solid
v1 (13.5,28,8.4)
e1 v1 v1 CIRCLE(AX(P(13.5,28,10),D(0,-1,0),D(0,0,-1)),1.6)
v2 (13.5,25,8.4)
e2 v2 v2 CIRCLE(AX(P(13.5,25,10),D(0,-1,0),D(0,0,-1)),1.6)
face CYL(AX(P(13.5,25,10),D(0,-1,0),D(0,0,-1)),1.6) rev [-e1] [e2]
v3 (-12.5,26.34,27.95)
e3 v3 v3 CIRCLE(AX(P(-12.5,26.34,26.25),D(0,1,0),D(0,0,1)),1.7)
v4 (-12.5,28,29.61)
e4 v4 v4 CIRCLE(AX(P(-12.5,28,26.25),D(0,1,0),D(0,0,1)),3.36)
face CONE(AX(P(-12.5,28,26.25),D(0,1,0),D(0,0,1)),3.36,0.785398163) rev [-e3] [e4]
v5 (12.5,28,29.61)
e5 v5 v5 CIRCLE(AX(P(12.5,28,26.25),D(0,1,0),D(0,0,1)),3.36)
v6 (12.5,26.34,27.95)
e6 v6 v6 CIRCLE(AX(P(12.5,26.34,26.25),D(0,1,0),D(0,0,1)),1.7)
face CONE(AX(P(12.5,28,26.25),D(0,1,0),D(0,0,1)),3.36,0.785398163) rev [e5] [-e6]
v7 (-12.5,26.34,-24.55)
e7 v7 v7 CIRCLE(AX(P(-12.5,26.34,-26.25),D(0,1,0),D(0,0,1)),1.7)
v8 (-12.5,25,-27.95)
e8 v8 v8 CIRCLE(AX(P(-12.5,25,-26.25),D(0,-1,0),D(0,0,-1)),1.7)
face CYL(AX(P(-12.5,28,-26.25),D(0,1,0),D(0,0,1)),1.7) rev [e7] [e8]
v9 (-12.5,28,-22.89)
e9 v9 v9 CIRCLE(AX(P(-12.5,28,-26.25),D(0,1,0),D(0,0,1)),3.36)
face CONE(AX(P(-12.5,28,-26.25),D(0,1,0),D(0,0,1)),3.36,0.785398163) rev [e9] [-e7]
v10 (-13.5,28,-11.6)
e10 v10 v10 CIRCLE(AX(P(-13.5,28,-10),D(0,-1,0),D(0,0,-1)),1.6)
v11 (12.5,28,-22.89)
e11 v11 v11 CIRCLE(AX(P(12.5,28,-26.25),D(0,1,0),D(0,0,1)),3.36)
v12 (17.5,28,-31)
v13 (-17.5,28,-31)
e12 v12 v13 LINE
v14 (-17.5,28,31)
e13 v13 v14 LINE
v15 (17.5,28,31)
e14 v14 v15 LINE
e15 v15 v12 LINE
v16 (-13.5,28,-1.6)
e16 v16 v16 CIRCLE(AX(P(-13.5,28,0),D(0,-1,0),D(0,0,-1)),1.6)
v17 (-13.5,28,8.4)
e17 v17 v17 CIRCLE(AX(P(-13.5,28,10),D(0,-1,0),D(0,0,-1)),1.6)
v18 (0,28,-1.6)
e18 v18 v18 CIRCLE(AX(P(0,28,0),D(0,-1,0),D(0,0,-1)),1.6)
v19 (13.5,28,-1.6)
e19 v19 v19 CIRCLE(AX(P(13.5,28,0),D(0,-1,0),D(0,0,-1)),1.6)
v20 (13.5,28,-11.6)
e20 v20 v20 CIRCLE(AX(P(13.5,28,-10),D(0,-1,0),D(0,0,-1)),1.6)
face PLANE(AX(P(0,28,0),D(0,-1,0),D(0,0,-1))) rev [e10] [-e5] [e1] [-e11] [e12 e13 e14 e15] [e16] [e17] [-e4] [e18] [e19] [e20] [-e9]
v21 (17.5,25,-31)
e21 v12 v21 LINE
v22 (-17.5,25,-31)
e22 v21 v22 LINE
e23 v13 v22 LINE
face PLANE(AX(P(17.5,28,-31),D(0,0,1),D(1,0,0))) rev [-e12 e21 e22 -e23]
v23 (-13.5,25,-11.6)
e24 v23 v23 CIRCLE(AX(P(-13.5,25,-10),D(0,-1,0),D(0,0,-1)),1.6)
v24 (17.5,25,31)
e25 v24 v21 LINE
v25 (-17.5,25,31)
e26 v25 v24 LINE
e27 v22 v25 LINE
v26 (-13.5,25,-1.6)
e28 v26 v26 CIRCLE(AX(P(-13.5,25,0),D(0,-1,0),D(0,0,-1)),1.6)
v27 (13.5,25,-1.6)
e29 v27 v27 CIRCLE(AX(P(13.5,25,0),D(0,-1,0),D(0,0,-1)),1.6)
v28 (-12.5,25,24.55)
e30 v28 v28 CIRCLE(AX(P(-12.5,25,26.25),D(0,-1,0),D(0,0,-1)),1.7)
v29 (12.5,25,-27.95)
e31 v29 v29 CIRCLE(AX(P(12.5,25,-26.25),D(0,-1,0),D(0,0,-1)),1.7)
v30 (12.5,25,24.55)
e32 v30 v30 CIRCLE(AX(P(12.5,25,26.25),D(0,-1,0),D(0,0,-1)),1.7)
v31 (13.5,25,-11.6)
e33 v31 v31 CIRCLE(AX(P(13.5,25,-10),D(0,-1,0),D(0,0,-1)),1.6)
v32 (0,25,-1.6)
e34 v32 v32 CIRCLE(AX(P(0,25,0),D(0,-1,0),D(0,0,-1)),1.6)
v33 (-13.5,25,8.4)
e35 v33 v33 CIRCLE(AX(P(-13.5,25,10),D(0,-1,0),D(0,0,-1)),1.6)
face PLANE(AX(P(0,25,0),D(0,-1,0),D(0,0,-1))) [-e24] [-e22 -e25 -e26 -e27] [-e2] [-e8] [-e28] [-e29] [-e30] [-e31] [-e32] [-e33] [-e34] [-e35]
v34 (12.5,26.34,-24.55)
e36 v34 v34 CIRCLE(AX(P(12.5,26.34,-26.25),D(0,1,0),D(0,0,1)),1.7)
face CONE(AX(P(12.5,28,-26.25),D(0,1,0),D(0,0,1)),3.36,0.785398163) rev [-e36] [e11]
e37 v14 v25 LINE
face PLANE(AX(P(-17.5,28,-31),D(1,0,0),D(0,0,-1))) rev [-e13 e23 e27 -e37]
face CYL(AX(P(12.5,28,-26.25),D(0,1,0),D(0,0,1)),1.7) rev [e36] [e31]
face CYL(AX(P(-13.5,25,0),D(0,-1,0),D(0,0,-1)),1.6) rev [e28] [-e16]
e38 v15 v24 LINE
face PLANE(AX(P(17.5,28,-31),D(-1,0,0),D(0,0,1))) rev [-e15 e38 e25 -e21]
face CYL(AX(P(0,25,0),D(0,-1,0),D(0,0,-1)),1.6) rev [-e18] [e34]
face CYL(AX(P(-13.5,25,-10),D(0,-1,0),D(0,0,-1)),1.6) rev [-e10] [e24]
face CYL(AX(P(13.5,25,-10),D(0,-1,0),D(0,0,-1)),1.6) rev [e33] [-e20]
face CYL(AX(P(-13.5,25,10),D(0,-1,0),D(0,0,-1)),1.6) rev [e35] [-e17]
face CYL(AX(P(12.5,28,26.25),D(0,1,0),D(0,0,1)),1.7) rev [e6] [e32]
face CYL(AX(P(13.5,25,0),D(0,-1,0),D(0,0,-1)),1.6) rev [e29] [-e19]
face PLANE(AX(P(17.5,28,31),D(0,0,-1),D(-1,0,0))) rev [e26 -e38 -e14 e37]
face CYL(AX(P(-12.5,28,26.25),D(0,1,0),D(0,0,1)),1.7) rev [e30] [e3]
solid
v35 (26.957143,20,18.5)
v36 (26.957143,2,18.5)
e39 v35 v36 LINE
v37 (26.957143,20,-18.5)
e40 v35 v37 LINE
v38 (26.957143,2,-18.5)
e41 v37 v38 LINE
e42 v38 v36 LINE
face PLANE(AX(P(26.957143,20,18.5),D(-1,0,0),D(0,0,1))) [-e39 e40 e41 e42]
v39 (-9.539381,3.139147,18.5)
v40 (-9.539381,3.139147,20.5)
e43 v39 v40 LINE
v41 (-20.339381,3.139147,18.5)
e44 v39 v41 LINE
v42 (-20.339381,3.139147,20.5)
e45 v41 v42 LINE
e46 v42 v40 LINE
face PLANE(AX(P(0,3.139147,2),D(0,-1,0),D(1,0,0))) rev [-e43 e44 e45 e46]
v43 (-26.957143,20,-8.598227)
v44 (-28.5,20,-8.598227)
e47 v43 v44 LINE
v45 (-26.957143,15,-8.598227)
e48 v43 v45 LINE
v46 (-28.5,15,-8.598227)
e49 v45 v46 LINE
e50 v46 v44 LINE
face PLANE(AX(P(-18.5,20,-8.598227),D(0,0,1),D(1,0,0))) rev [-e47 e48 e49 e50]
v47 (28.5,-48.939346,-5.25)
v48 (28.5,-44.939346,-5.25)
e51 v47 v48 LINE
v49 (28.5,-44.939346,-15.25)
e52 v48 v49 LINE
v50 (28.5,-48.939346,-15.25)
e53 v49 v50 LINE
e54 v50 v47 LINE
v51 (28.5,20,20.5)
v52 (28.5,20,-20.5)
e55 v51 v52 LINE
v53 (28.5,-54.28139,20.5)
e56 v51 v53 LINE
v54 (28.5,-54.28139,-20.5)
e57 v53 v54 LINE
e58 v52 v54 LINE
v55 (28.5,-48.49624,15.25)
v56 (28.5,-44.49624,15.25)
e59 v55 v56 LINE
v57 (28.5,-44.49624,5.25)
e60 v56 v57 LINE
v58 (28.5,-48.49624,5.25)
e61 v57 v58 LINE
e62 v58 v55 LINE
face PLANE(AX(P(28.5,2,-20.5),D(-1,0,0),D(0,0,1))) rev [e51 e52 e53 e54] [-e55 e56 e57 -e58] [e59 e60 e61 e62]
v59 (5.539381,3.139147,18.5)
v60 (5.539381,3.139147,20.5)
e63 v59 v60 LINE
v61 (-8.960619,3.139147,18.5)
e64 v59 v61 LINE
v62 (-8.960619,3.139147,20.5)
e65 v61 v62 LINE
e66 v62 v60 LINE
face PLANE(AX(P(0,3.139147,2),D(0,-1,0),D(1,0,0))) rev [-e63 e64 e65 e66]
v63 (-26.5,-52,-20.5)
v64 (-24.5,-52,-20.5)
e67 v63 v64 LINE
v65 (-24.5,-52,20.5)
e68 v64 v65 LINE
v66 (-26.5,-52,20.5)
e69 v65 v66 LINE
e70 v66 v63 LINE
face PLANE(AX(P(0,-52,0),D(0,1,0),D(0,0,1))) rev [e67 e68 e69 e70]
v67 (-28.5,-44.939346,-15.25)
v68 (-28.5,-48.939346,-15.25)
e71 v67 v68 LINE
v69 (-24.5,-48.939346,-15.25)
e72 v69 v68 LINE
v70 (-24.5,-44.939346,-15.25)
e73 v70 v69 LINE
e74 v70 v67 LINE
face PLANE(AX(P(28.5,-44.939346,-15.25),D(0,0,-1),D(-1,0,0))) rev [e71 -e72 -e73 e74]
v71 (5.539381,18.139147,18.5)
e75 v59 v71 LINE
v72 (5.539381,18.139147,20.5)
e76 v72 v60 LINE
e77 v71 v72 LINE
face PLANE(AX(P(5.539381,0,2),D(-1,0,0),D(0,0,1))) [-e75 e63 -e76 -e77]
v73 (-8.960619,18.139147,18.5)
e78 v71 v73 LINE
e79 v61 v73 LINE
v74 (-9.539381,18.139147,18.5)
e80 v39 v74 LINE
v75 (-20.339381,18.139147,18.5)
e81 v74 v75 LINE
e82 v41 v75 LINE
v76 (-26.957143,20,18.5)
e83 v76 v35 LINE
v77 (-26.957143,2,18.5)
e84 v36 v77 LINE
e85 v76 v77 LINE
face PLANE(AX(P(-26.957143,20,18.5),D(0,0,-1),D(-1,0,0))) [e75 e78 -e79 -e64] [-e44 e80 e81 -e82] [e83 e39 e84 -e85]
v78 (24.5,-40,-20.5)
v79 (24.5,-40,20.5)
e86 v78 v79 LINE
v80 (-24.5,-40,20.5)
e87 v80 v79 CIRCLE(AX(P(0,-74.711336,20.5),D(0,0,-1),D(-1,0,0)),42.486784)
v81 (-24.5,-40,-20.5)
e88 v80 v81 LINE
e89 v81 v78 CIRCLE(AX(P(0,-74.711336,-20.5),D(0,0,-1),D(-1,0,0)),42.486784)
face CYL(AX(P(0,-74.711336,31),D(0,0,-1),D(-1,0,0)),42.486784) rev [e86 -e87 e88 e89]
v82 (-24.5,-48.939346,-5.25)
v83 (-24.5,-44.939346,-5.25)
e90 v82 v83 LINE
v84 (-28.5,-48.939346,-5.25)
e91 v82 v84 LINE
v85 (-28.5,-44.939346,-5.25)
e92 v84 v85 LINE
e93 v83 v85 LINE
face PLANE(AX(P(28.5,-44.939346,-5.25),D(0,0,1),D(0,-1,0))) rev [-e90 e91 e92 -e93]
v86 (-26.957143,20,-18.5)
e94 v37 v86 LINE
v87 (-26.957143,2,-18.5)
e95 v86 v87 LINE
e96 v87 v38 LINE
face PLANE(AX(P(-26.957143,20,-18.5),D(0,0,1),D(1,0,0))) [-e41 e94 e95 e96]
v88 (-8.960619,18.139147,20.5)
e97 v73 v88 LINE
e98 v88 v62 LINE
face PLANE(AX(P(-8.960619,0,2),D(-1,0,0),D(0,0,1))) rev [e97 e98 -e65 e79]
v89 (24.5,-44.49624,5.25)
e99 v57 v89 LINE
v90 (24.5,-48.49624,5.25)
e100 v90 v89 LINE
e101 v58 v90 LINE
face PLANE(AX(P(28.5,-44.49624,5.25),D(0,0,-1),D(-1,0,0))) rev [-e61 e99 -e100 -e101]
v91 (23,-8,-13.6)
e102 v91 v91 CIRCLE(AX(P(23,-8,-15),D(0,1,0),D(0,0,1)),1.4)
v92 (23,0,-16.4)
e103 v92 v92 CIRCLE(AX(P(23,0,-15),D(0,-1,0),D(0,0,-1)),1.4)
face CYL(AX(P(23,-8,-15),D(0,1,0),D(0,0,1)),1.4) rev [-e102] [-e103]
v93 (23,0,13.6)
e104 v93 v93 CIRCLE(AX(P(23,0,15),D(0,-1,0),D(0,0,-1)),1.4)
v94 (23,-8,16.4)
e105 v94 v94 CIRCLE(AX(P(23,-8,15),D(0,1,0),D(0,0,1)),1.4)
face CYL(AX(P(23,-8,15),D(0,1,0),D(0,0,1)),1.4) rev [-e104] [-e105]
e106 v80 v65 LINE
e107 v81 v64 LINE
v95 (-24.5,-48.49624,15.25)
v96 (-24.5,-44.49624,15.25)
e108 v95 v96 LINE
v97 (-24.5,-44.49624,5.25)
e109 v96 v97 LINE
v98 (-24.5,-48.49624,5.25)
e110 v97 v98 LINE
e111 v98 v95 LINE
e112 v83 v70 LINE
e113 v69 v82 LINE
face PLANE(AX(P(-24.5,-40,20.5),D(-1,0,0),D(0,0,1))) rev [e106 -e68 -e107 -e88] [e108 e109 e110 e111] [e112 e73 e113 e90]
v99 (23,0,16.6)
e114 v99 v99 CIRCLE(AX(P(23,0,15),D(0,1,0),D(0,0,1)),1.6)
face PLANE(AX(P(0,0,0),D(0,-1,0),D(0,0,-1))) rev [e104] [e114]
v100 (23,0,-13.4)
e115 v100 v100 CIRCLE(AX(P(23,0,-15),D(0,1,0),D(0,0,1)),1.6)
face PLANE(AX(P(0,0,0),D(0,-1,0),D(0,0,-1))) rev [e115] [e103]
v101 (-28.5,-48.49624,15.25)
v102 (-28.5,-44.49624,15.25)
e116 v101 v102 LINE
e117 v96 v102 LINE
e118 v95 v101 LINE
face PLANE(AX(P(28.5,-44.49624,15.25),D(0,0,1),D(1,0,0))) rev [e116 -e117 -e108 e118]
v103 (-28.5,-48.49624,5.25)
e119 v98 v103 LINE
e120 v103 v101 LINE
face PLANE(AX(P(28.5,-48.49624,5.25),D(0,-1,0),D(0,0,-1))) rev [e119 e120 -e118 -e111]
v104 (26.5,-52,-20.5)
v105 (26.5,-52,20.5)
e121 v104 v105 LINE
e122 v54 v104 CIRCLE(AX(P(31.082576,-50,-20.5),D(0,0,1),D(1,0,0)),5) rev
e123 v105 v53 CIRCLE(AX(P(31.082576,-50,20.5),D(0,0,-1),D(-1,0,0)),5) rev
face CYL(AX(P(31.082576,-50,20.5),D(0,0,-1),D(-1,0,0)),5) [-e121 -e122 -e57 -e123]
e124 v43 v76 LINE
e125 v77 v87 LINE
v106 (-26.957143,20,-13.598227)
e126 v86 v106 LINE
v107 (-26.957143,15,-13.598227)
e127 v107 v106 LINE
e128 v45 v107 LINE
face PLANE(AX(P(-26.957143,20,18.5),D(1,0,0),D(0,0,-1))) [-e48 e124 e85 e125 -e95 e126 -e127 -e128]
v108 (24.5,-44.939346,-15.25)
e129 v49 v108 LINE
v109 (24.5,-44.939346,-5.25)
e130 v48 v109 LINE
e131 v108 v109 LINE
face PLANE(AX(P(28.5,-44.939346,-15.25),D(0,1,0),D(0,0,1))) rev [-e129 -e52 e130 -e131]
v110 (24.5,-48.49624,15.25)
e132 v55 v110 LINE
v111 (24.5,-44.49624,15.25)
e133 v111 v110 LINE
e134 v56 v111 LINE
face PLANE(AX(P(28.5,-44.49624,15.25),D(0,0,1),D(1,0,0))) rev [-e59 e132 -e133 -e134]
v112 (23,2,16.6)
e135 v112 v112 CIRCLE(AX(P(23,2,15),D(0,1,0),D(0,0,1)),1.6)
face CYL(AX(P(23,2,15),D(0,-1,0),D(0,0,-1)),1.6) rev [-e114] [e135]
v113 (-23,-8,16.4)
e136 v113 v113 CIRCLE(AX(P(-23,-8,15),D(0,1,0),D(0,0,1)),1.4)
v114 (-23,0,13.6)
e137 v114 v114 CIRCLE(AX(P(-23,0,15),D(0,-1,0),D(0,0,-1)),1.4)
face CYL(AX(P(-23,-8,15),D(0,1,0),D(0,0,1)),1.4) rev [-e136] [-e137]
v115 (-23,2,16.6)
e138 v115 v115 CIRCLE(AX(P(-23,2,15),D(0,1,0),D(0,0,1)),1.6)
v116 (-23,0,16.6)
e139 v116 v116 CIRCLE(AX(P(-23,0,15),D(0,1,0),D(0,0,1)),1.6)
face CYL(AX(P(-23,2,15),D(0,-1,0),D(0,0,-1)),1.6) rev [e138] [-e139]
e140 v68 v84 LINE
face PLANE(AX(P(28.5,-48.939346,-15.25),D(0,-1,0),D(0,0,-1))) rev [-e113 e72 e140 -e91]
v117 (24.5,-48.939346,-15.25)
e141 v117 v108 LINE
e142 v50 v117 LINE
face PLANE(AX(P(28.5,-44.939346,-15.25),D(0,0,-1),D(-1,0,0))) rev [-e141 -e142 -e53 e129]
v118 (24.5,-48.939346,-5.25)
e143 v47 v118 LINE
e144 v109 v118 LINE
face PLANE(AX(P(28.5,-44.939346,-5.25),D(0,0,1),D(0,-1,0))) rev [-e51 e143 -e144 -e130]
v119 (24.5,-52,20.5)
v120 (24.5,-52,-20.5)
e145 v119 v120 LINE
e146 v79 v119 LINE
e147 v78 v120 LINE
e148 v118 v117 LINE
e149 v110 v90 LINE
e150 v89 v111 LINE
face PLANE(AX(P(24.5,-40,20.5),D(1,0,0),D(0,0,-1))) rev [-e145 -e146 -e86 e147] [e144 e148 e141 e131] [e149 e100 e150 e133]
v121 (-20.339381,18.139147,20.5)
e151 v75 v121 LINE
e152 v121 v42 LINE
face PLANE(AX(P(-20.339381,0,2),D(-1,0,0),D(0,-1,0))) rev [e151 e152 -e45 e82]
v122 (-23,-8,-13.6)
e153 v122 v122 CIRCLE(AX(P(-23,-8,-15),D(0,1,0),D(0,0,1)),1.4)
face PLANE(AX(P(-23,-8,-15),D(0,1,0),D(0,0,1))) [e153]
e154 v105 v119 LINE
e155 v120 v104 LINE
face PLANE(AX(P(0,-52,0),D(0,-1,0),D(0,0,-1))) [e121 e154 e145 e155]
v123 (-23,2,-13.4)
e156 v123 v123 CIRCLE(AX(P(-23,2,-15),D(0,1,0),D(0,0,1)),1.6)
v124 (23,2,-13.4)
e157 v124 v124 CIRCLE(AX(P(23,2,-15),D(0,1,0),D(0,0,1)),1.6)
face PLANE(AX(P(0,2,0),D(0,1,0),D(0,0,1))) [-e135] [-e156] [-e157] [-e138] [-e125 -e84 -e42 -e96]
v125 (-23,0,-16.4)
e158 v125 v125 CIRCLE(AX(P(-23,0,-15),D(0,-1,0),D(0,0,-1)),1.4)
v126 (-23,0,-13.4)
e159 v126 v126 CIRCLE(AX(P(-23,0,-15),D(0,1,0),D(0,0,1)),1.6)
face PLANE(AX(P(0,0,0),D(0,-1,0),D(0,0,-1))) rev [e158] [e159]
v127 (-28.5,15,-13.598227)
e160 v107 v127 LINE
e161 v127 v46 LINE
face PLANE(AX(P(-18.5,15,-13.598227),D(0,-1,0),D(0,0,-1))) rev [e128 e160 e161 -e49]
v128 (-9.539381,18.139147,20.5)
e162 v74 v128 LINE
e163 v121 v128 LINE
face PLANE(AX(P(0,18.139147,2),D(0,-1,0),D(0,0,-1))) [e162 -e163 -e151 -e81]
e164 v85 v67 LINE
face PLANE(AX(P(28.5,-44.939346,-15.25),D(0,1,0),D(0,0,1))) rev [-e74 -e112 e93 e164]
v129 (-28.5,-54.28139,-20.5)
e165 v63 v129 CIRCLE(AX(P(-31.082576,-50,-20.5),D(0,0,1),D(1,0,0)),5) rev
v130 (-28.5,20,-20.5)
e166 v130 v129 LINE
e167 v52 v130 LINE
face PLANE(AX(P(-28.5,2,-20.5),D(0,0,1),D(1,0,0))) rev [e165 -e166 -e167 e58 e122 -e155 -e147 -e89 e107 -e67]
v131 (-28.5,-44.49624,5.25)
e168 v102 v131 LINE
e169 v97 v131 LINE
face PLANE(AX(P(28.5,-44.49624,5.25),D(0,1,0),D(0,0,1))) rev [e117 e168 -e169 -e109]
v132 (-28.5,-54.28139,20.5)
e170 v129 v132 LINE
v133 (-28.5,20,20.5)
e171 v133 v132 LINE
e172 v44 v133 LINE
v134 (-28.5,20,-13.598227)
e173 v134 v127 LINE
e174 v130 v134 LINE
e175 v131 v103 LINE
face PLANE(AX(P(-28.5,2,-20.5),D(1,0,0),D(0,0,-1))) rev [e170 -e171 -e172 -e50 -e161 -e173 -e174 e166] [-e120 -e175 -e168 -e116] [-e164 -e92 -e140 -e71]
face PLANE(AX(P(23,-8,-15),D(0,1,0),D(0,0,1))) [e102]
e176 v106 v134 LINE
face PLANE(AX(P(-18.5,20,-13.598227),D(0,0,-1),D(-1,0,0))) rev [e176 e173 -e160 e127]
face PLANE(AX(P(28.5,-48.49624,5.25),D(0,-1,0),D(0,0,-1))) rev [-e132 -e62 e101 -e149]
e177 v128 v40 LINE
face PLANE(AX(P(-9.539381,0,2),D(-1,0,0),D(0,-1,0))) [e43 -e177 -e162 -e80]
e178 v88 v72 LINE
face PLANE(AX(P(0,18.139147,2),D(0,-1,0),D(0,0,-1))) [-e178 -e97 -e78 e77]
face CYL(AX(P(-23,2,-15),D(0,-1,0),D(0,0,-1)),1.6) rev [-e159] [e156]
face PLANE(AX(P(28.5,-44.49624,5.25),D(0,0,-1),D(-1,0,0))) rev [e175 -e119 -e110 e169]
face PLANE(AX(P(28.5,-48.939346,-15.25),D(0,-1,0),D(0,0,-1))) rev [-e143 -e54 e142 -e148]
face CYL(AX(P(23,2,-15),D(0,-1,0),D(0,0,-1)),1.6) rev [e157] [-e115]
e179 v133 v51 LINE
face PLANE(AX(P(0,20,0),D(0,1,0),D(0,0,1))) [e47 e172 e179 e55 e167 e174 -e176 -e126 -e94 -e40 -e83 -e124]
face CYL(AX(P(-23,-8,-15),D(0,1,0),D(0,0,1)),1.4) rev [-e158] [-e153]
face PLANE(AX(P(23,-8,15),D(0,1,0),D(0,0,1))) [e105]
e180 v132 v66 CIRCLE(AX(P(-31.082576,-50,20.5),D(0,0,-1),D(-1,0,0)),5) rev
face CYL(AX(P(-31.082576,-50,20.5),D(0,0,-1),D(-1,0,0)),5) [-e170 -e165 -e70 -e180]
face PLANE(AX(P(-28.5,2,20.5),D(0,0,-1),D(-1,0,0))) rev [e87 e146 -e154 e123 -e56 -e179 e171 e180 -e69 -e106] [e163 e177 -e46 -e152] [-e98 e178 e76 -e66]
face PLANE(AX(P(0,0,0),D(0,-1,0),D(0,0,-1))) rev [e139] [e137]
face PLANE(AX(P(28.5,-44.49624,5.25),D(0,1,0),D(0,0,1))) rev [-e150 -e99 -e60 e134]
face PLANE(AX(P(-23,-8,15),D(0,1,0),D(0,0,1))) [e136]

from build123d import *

# Parameters (mm, degrees)
SKETCH_2_W           = 57
SKETCH_2_H           = 41
EXTRUDE_1_DEPTH      = 2
SKETCH_1_R           = 1.6
CUT_EXTRUDE_1_DEPTH  = 2
SKETCH_4_W           = 57
SKETCH_4_H           = 41
SKETCH_4_W_2         = 53.914285714
SKETCH_4_H_2         = 37
EXTRUDE_2_DEPTH      = 20
SKETCH_5_W           = 10.8
SKETCH_5_H           = 13
SKETCH_5_H_2         = 2
SKETCH_5_W_2         = 14.5
CUT_EXTRUDE_2_DEPTH  = 18.5
EXTRUDE_START        = 25
SKETCH_6_W           = 35
SKETCH_6_H           = 62
EXTRUDE_3_DEPTH      = 3
SKETCH_8_W           = 5
SKETCH_8_H           = 5
CUT_EXTRUDE_6_DEPTH  = 10
SKETCH_9_W           = 57
SKETCH_9_H           = 41
EXTRUDE_4_DEPTH      = 40
SKETCH_10_R          = 1.4
CUT_EXTRUDE_7_DEPTH  = 10
SKETCH_12_W          = 8
SKETCH_12_H          = 41
EXTRUDE_5_DEPTH      = 15
SKETCH_13_W          = 4
SKETCH_13_H          = 41
CUT_EXTRUDE_8_DEPTH  = 15
SKETCH_14_W          = 2
SKETCH_14_H          = 41
CUT_EXTRUDE_9_DEPTH  = 3
SKETCH_15_W          = 10
SKETCH_15_H          = 4
CUT_EXTRUDE_10_DEPTH = 86.058803189
CUT_EXTRUDE_12_DEPTH = 81.557432928
FILLET_1_R           = 5
F_3_0MM_START        = 25
F_3_0MM_1_OUTLINE_R  = 1.6
F_3_0MM_1_DEPTH      = 3


# Read off the part's stored shape, not the designer's step: M3 六角凹锥坑螺钉的锥形沉头孔1, Ø3.0mm 暗销孔1
with BuildPart() as part:
    # 草图2 → 凸台-拉伸1 (new body)
    with BuildSketch(Plane(origin=(0, 0, 0), x_dir=(1, 0, 0), z_dir=(0, 1, 0))):
        Rectangle(SKETCH_2_W, SKETCH_2_H)
    extrude(amount=EXTRUDE_1_DEPTH)

    # 草图1 → 切除-拉伸1 (cut)
    with BuildSketch(Plane(origin=(0, 0, 0), x_dir=(1, 0, 0), z_dir=(0, 1, 0))):
        with Locations(Location((-23, 15, 0), (0, 0, 270))):
            Circle(SKETCH_1_R)
        with Locations(Location((-23, -15, 0), (0, 0, 270))):
            Circle(SKETCH_1_R)
        with Locations(Location((23, -15, 0), (0, 0, 270))):
            Circle(SKETCH_1_R)
        with Locations(Location((23, 15, 0), (0, 0, 270))):
            Circle(SKETCH_1_R)
    extrude(amount=CUT_EXTRUDE_1_DEPTH, mode=Mode.SUBTRACT)

    # 草图4 → 凸台-拉伸2 (add)
    with BuildSketch(Plane(origin=(0, 0, 0), x_dir=(1, 0, 0), z_dir=(0, 1, 0))):
        Rectangle(SKETCH_4_W, SKETCH_4_H)
        Rectangle(SKETCH_4_W_2, SKETCH_4_H_2, mode=Mode.SUBTRACT)
    extrude(amount=EXTRUDE_2_DEPTH)

    # 草图5 → 切除-拉伸2 (cut)
    with BuildSketch(Plane.XY.offset(20.5)):
        with Locations((-14.939380763, 9.639146882)):
            Rectangle(SKETCH_5_W, SKETCH_5_H)
        with Locations((-14.939380763, 17.139146882)):
            Rectangle(SKETCH_5_W, SKETCH_5_H_2)
        with Locations((-1.710619237, 9.639146882)):
            Rectangle(SKETCH_5_W_2, SKETCH_5_H)
        with Locations((-1.710619237, 17.139146882)):
            Rectangle(SKETCH_5_W_2, SKETCH_5_H_2)
    extrude(amount=-CUT_EXTRUDE_2_DEPTH, mode=Mode.SUBTRACT)

    # 草图8 → 切除-拉伸6 (cut)
    with BuildSketch(Plane.ZY.offset(28.5)):
        with Locations((-11.098227415, 17.5)):
            Rectangle(SKETCH_8_W, SKETCH_8_H)
    extrude(amount=-CUT_EXTRUDE_6_DEPTH, mode=Mode.SUBTRACT)

    # 草图9 → 凸台-拉伸4 (add)
    with BuildSketch(Plane.XZ):
        Rectangle(SKETCH_9_W, SKETCH_9_H)
    extrude(amount=EXTRUDE_4_DEPTH)

    # 草图10 → 切除-拉伸7 (cut)
    with BuildSketch(Plane(origin=(0, 2, 0), x_dir=(1, 0, 0), z_dir=(0, 1, 0))):
        with Locations(Location((-23, 15, 0), (0, 0, 270))):
            Circle(SKETCH_10_R)
        with Locations(Location((-23, -15, 0), (0, 0, 270))):
            Circle(SKETCH_10_R)
        with Locations(Location((23, -15, 0), (0, 0, 270))):
            Circle(SKETCH_10_R)
        with Locations(Location((23, 15, 0), (0, 0, 270))):
            Circle(SKETCH_10_R)
    extrude(amount=-CUT_EXTRUDE_7_DEPTH, mode=Mode.SUBTRACT)

    # 草图12 → 凸台-拉伸5 (add)
    with BuildSketch(Plane.XZ.offset(40)):
        with Locations((-24.5, 0)):
            Rectangle(SKETCH_12_W, SKETCH_12_H)
        with Locations((24.5, 0)):
            Rectangle(SKETCH_12_W, SKETCH_12_H)
    extrude(amount=EXTRUDE_5_DEPTH)

    # 草图13 → 切除-拉伸8 (cut)
    with BuildSketch(Plane.XZ.offset(55)):
        with Locations((-22.5, 0)):
            Rectangle(SKETCH_13_W, SKETCH_13_H)
        with Locations((22.5, 0)):
            Rectangle(SKETCH_13_W, SKETCH_13_H)
    extrude(amount=-CUT_EXTRUDE_8_DEPTH, mode=Mode.SUBTRACT)

    # 草图14 → 切除-拉伸9 (cut)
    with BuildSketch(Plane.XZ.offset(55)):
        with Locations((-25.5, 0)):
            Rectangle(SKETCH_14_W, SKETCH_14_H)
        with Locations((25.5, 0)):
            Rectangle(SKETCH_14_W, SKETCH_14_H)
    extrude(amount=-CUT_EXTRUDE_9_DEPTH, mode=Mode.SUBTRACT)

    # 草图15 → 切除-拉伸10 (cut, through all)
    with BuildSketch(Plane.ZY.offset(28.5)):
        with Locations((-10.25, -46.939346002)):
            Rectangle(SKETCH_15_W, SKETCH_15_H)
        with Locations((10.25, -46.496240266)):
            Rectangle(SKETCH_15_W, SKETCH_15_H)
    extrude(amount=-CUT_EXTRUDE_10_DEPTH, mode=Mode.SUBTRACT)

    # 草图19 → 切除-拉伸12 (cut, through all)
    with BuildSketch(Plane(origin=(0, 0, -20.5), x_dir=(-1, 0, 0), z_dir=(0, 0, -1))):
        with BuildLine():
            ThreePointArc((24.5, -40), (0, -32.224551533), (-24.5, -40))
            Line((-24.5, -40), (24.5, -40))
        make_face()
    extrude(amount=-CUT_EXTRUDE_12_DEPTH, mode=Mode.SUBTRACT)

    # 圆角1
    # the kernel refuses this fillet: 5 mm, written as the material it takes off along each edge
    with BuildSketch(Plane(origin=(26.5, -55, 31.956439237), x_dir=(0, 1, 0), z_dir=(0, 0, -1))) as fillet_1_piece_1:
        with BuildLine():
            CenterArc((5, 4.582575695), FILLET_1_R, 180, 66.421821522)
            Line((0, 4.582575695), (-0.1, 4.582575695))
            Line((-0.1, 4.582575695), (-0.1, 0))
            Line((-0.1, 0), (0, -0.1))
            ThreePointArc((0, -0.1), (1.5, -0.1), (2.96, -0.091651514))
            Line((2.96, -0.091651514), (3, 0))
        make_face()
    extrude(amount=63.912878475, mode=Mode.SUBTRACT)
    with BuildSketch(Plane(origin=(-26.5, -55, 31.956439237), x_dir=(0, 1, 0), z_dir=(0, 0, -1))) as fillet_1_piece_2:
        with BuildLine():
            CenterArc((5, -4.582575695), FILLET_1_R, 113.578178478, 66.421821522)
            Line((0, -4.582575695), (-0.1, -4.582575695))
            Line((-0.1, -4.582575695), (-0.1, 0))
            Line((-0.1, 0), (0, 0.1))
            ThreePointArc((0, 0.1), (1.5, 0.1), (2.96, 0.091651514))
            Line((2.96, 0.091651514), (3, 0))
        make_face()
    extrude(amount=63.912878475, mode=Mode.SUBTRACT)


with BuildPart() as body_2:
    # 草图6 → 凸台-拉伸3 (new body)
    with BuildSketch(Plane(origin=(0, 0, 0), x_dir=(1, 0, 0), z_dir=(0, 1, 0)).offset(EXTRUDE_START)):
        Rectangle(SKETCH_6_W, SKETCH_6_H)
    extrude(amount=EXTRUDE_3_DEPTH)

    # M3 六角凹锥坑螺钉的锥形沉头孔1 outline → M3 六角凹锥坑螺钉的锥形沉头孔1 (revolve, cut)
    with BuildSketch(Plane(origin=(-12.5, 0, -26.25), x_dir=(1, 0, 0), z_dir=(0, 0, 1))):
        Polygon((0, 25), (1.7, 25), (1.7, 26.34), (3.36, 28), (0, 28), align=None)
    revolve(axis=Axis((-12.5, 0, -26.25), (0, 1, 0)), mode=Mode.SUBTRACT)

    # Hole Wizard M3 _1 2 outline → Hole Wizard M3 _1 2 (revolve, cut)
    with BuildSketch(Plane(origin=(12.5, 0, 26.25), x_dir=(1, 0, 0), z_dir=(0, 0, 1))):
        Polygon((0, 25), (1.7, 25), (1.7, 26.34), (3.36, 28), (0, 28), align=None)
    revolve(axis=Axis((12.5, 0, 26.25), (0, 1, 0)), mode=Mode.SUBTRACT)

    # Hole Wizard M3 _1 3 outline → Hole Wizard M3 _1 3 (revolve, cut)
    with BuildSketch(Plane(origin=(12.5, 0, -26.25), x_dir=(1, 0, 0), z_dir=(0, 0, 1))):
        Polygon((0, 25), (1.7, 25), (1.7, 26.34), (3.36, 28), (0, 28), align=None)
    revolve(axis=Axis((12.5, 0, -26.25), (0, 1, 0)), mode=Mode.SUBTRACT)

    # Hole Wizard M3 _1 4 outline → Hole Wizard M3 _1 4 (revolve, cut)
    with BuildSketch(Plane(origin=(-12.5, 0, 26.25), x_dir=(1, 0, 0), z_dir=(0, 0, 1))):
        Polygon((0, 25), (1.7, 25), (1.7, 26.34), (3.36, 28), (0, 28), align=None)
    revolve(axis=Axis((-12.5, 0, 26.25), (0, 1, 0)), mode=Mode.SUBTRACT)

    # Ø3.0mm 暗销孔1 outline → Ø3.0mm 暗销孔1 (cut)
    with BuildSketch(Plane(origin=(0, 0, 0), x_dir=(1, 0, 0), z_dir=(0, 1, 0)).offset(F_3_0MM_START)):
        with Locations((-13.5, 0)):
            Circle(F_3_0MM_1_OUTLINE_R)
        with Locations((13.5, 0)):
            Circle(F_3_0MM_1_OUTLINE_R)
        with Locations((-13.5, -10)):
            Circle(F_3_0MM_1_OUTLINE_R)
        with Locations((13.5, 10)):
            Circle(F_3_0MM_1_OUTLINE_R)
        with Locations((13.5, -10)):
            Circle(F_3_0MM_1_OUTLINE_R)
        with Locations((-13.5, 10)):
            Circle(F_3_0MM_1_OUTLINE_R)
        Circle(F_3_0MM_1_OUTLINE_R)
    extrude(amount=F_3_0MM_1_DEPTH, mode=Mode.SUBTRACT)


solid = Compound([part.part, body_2.part])
